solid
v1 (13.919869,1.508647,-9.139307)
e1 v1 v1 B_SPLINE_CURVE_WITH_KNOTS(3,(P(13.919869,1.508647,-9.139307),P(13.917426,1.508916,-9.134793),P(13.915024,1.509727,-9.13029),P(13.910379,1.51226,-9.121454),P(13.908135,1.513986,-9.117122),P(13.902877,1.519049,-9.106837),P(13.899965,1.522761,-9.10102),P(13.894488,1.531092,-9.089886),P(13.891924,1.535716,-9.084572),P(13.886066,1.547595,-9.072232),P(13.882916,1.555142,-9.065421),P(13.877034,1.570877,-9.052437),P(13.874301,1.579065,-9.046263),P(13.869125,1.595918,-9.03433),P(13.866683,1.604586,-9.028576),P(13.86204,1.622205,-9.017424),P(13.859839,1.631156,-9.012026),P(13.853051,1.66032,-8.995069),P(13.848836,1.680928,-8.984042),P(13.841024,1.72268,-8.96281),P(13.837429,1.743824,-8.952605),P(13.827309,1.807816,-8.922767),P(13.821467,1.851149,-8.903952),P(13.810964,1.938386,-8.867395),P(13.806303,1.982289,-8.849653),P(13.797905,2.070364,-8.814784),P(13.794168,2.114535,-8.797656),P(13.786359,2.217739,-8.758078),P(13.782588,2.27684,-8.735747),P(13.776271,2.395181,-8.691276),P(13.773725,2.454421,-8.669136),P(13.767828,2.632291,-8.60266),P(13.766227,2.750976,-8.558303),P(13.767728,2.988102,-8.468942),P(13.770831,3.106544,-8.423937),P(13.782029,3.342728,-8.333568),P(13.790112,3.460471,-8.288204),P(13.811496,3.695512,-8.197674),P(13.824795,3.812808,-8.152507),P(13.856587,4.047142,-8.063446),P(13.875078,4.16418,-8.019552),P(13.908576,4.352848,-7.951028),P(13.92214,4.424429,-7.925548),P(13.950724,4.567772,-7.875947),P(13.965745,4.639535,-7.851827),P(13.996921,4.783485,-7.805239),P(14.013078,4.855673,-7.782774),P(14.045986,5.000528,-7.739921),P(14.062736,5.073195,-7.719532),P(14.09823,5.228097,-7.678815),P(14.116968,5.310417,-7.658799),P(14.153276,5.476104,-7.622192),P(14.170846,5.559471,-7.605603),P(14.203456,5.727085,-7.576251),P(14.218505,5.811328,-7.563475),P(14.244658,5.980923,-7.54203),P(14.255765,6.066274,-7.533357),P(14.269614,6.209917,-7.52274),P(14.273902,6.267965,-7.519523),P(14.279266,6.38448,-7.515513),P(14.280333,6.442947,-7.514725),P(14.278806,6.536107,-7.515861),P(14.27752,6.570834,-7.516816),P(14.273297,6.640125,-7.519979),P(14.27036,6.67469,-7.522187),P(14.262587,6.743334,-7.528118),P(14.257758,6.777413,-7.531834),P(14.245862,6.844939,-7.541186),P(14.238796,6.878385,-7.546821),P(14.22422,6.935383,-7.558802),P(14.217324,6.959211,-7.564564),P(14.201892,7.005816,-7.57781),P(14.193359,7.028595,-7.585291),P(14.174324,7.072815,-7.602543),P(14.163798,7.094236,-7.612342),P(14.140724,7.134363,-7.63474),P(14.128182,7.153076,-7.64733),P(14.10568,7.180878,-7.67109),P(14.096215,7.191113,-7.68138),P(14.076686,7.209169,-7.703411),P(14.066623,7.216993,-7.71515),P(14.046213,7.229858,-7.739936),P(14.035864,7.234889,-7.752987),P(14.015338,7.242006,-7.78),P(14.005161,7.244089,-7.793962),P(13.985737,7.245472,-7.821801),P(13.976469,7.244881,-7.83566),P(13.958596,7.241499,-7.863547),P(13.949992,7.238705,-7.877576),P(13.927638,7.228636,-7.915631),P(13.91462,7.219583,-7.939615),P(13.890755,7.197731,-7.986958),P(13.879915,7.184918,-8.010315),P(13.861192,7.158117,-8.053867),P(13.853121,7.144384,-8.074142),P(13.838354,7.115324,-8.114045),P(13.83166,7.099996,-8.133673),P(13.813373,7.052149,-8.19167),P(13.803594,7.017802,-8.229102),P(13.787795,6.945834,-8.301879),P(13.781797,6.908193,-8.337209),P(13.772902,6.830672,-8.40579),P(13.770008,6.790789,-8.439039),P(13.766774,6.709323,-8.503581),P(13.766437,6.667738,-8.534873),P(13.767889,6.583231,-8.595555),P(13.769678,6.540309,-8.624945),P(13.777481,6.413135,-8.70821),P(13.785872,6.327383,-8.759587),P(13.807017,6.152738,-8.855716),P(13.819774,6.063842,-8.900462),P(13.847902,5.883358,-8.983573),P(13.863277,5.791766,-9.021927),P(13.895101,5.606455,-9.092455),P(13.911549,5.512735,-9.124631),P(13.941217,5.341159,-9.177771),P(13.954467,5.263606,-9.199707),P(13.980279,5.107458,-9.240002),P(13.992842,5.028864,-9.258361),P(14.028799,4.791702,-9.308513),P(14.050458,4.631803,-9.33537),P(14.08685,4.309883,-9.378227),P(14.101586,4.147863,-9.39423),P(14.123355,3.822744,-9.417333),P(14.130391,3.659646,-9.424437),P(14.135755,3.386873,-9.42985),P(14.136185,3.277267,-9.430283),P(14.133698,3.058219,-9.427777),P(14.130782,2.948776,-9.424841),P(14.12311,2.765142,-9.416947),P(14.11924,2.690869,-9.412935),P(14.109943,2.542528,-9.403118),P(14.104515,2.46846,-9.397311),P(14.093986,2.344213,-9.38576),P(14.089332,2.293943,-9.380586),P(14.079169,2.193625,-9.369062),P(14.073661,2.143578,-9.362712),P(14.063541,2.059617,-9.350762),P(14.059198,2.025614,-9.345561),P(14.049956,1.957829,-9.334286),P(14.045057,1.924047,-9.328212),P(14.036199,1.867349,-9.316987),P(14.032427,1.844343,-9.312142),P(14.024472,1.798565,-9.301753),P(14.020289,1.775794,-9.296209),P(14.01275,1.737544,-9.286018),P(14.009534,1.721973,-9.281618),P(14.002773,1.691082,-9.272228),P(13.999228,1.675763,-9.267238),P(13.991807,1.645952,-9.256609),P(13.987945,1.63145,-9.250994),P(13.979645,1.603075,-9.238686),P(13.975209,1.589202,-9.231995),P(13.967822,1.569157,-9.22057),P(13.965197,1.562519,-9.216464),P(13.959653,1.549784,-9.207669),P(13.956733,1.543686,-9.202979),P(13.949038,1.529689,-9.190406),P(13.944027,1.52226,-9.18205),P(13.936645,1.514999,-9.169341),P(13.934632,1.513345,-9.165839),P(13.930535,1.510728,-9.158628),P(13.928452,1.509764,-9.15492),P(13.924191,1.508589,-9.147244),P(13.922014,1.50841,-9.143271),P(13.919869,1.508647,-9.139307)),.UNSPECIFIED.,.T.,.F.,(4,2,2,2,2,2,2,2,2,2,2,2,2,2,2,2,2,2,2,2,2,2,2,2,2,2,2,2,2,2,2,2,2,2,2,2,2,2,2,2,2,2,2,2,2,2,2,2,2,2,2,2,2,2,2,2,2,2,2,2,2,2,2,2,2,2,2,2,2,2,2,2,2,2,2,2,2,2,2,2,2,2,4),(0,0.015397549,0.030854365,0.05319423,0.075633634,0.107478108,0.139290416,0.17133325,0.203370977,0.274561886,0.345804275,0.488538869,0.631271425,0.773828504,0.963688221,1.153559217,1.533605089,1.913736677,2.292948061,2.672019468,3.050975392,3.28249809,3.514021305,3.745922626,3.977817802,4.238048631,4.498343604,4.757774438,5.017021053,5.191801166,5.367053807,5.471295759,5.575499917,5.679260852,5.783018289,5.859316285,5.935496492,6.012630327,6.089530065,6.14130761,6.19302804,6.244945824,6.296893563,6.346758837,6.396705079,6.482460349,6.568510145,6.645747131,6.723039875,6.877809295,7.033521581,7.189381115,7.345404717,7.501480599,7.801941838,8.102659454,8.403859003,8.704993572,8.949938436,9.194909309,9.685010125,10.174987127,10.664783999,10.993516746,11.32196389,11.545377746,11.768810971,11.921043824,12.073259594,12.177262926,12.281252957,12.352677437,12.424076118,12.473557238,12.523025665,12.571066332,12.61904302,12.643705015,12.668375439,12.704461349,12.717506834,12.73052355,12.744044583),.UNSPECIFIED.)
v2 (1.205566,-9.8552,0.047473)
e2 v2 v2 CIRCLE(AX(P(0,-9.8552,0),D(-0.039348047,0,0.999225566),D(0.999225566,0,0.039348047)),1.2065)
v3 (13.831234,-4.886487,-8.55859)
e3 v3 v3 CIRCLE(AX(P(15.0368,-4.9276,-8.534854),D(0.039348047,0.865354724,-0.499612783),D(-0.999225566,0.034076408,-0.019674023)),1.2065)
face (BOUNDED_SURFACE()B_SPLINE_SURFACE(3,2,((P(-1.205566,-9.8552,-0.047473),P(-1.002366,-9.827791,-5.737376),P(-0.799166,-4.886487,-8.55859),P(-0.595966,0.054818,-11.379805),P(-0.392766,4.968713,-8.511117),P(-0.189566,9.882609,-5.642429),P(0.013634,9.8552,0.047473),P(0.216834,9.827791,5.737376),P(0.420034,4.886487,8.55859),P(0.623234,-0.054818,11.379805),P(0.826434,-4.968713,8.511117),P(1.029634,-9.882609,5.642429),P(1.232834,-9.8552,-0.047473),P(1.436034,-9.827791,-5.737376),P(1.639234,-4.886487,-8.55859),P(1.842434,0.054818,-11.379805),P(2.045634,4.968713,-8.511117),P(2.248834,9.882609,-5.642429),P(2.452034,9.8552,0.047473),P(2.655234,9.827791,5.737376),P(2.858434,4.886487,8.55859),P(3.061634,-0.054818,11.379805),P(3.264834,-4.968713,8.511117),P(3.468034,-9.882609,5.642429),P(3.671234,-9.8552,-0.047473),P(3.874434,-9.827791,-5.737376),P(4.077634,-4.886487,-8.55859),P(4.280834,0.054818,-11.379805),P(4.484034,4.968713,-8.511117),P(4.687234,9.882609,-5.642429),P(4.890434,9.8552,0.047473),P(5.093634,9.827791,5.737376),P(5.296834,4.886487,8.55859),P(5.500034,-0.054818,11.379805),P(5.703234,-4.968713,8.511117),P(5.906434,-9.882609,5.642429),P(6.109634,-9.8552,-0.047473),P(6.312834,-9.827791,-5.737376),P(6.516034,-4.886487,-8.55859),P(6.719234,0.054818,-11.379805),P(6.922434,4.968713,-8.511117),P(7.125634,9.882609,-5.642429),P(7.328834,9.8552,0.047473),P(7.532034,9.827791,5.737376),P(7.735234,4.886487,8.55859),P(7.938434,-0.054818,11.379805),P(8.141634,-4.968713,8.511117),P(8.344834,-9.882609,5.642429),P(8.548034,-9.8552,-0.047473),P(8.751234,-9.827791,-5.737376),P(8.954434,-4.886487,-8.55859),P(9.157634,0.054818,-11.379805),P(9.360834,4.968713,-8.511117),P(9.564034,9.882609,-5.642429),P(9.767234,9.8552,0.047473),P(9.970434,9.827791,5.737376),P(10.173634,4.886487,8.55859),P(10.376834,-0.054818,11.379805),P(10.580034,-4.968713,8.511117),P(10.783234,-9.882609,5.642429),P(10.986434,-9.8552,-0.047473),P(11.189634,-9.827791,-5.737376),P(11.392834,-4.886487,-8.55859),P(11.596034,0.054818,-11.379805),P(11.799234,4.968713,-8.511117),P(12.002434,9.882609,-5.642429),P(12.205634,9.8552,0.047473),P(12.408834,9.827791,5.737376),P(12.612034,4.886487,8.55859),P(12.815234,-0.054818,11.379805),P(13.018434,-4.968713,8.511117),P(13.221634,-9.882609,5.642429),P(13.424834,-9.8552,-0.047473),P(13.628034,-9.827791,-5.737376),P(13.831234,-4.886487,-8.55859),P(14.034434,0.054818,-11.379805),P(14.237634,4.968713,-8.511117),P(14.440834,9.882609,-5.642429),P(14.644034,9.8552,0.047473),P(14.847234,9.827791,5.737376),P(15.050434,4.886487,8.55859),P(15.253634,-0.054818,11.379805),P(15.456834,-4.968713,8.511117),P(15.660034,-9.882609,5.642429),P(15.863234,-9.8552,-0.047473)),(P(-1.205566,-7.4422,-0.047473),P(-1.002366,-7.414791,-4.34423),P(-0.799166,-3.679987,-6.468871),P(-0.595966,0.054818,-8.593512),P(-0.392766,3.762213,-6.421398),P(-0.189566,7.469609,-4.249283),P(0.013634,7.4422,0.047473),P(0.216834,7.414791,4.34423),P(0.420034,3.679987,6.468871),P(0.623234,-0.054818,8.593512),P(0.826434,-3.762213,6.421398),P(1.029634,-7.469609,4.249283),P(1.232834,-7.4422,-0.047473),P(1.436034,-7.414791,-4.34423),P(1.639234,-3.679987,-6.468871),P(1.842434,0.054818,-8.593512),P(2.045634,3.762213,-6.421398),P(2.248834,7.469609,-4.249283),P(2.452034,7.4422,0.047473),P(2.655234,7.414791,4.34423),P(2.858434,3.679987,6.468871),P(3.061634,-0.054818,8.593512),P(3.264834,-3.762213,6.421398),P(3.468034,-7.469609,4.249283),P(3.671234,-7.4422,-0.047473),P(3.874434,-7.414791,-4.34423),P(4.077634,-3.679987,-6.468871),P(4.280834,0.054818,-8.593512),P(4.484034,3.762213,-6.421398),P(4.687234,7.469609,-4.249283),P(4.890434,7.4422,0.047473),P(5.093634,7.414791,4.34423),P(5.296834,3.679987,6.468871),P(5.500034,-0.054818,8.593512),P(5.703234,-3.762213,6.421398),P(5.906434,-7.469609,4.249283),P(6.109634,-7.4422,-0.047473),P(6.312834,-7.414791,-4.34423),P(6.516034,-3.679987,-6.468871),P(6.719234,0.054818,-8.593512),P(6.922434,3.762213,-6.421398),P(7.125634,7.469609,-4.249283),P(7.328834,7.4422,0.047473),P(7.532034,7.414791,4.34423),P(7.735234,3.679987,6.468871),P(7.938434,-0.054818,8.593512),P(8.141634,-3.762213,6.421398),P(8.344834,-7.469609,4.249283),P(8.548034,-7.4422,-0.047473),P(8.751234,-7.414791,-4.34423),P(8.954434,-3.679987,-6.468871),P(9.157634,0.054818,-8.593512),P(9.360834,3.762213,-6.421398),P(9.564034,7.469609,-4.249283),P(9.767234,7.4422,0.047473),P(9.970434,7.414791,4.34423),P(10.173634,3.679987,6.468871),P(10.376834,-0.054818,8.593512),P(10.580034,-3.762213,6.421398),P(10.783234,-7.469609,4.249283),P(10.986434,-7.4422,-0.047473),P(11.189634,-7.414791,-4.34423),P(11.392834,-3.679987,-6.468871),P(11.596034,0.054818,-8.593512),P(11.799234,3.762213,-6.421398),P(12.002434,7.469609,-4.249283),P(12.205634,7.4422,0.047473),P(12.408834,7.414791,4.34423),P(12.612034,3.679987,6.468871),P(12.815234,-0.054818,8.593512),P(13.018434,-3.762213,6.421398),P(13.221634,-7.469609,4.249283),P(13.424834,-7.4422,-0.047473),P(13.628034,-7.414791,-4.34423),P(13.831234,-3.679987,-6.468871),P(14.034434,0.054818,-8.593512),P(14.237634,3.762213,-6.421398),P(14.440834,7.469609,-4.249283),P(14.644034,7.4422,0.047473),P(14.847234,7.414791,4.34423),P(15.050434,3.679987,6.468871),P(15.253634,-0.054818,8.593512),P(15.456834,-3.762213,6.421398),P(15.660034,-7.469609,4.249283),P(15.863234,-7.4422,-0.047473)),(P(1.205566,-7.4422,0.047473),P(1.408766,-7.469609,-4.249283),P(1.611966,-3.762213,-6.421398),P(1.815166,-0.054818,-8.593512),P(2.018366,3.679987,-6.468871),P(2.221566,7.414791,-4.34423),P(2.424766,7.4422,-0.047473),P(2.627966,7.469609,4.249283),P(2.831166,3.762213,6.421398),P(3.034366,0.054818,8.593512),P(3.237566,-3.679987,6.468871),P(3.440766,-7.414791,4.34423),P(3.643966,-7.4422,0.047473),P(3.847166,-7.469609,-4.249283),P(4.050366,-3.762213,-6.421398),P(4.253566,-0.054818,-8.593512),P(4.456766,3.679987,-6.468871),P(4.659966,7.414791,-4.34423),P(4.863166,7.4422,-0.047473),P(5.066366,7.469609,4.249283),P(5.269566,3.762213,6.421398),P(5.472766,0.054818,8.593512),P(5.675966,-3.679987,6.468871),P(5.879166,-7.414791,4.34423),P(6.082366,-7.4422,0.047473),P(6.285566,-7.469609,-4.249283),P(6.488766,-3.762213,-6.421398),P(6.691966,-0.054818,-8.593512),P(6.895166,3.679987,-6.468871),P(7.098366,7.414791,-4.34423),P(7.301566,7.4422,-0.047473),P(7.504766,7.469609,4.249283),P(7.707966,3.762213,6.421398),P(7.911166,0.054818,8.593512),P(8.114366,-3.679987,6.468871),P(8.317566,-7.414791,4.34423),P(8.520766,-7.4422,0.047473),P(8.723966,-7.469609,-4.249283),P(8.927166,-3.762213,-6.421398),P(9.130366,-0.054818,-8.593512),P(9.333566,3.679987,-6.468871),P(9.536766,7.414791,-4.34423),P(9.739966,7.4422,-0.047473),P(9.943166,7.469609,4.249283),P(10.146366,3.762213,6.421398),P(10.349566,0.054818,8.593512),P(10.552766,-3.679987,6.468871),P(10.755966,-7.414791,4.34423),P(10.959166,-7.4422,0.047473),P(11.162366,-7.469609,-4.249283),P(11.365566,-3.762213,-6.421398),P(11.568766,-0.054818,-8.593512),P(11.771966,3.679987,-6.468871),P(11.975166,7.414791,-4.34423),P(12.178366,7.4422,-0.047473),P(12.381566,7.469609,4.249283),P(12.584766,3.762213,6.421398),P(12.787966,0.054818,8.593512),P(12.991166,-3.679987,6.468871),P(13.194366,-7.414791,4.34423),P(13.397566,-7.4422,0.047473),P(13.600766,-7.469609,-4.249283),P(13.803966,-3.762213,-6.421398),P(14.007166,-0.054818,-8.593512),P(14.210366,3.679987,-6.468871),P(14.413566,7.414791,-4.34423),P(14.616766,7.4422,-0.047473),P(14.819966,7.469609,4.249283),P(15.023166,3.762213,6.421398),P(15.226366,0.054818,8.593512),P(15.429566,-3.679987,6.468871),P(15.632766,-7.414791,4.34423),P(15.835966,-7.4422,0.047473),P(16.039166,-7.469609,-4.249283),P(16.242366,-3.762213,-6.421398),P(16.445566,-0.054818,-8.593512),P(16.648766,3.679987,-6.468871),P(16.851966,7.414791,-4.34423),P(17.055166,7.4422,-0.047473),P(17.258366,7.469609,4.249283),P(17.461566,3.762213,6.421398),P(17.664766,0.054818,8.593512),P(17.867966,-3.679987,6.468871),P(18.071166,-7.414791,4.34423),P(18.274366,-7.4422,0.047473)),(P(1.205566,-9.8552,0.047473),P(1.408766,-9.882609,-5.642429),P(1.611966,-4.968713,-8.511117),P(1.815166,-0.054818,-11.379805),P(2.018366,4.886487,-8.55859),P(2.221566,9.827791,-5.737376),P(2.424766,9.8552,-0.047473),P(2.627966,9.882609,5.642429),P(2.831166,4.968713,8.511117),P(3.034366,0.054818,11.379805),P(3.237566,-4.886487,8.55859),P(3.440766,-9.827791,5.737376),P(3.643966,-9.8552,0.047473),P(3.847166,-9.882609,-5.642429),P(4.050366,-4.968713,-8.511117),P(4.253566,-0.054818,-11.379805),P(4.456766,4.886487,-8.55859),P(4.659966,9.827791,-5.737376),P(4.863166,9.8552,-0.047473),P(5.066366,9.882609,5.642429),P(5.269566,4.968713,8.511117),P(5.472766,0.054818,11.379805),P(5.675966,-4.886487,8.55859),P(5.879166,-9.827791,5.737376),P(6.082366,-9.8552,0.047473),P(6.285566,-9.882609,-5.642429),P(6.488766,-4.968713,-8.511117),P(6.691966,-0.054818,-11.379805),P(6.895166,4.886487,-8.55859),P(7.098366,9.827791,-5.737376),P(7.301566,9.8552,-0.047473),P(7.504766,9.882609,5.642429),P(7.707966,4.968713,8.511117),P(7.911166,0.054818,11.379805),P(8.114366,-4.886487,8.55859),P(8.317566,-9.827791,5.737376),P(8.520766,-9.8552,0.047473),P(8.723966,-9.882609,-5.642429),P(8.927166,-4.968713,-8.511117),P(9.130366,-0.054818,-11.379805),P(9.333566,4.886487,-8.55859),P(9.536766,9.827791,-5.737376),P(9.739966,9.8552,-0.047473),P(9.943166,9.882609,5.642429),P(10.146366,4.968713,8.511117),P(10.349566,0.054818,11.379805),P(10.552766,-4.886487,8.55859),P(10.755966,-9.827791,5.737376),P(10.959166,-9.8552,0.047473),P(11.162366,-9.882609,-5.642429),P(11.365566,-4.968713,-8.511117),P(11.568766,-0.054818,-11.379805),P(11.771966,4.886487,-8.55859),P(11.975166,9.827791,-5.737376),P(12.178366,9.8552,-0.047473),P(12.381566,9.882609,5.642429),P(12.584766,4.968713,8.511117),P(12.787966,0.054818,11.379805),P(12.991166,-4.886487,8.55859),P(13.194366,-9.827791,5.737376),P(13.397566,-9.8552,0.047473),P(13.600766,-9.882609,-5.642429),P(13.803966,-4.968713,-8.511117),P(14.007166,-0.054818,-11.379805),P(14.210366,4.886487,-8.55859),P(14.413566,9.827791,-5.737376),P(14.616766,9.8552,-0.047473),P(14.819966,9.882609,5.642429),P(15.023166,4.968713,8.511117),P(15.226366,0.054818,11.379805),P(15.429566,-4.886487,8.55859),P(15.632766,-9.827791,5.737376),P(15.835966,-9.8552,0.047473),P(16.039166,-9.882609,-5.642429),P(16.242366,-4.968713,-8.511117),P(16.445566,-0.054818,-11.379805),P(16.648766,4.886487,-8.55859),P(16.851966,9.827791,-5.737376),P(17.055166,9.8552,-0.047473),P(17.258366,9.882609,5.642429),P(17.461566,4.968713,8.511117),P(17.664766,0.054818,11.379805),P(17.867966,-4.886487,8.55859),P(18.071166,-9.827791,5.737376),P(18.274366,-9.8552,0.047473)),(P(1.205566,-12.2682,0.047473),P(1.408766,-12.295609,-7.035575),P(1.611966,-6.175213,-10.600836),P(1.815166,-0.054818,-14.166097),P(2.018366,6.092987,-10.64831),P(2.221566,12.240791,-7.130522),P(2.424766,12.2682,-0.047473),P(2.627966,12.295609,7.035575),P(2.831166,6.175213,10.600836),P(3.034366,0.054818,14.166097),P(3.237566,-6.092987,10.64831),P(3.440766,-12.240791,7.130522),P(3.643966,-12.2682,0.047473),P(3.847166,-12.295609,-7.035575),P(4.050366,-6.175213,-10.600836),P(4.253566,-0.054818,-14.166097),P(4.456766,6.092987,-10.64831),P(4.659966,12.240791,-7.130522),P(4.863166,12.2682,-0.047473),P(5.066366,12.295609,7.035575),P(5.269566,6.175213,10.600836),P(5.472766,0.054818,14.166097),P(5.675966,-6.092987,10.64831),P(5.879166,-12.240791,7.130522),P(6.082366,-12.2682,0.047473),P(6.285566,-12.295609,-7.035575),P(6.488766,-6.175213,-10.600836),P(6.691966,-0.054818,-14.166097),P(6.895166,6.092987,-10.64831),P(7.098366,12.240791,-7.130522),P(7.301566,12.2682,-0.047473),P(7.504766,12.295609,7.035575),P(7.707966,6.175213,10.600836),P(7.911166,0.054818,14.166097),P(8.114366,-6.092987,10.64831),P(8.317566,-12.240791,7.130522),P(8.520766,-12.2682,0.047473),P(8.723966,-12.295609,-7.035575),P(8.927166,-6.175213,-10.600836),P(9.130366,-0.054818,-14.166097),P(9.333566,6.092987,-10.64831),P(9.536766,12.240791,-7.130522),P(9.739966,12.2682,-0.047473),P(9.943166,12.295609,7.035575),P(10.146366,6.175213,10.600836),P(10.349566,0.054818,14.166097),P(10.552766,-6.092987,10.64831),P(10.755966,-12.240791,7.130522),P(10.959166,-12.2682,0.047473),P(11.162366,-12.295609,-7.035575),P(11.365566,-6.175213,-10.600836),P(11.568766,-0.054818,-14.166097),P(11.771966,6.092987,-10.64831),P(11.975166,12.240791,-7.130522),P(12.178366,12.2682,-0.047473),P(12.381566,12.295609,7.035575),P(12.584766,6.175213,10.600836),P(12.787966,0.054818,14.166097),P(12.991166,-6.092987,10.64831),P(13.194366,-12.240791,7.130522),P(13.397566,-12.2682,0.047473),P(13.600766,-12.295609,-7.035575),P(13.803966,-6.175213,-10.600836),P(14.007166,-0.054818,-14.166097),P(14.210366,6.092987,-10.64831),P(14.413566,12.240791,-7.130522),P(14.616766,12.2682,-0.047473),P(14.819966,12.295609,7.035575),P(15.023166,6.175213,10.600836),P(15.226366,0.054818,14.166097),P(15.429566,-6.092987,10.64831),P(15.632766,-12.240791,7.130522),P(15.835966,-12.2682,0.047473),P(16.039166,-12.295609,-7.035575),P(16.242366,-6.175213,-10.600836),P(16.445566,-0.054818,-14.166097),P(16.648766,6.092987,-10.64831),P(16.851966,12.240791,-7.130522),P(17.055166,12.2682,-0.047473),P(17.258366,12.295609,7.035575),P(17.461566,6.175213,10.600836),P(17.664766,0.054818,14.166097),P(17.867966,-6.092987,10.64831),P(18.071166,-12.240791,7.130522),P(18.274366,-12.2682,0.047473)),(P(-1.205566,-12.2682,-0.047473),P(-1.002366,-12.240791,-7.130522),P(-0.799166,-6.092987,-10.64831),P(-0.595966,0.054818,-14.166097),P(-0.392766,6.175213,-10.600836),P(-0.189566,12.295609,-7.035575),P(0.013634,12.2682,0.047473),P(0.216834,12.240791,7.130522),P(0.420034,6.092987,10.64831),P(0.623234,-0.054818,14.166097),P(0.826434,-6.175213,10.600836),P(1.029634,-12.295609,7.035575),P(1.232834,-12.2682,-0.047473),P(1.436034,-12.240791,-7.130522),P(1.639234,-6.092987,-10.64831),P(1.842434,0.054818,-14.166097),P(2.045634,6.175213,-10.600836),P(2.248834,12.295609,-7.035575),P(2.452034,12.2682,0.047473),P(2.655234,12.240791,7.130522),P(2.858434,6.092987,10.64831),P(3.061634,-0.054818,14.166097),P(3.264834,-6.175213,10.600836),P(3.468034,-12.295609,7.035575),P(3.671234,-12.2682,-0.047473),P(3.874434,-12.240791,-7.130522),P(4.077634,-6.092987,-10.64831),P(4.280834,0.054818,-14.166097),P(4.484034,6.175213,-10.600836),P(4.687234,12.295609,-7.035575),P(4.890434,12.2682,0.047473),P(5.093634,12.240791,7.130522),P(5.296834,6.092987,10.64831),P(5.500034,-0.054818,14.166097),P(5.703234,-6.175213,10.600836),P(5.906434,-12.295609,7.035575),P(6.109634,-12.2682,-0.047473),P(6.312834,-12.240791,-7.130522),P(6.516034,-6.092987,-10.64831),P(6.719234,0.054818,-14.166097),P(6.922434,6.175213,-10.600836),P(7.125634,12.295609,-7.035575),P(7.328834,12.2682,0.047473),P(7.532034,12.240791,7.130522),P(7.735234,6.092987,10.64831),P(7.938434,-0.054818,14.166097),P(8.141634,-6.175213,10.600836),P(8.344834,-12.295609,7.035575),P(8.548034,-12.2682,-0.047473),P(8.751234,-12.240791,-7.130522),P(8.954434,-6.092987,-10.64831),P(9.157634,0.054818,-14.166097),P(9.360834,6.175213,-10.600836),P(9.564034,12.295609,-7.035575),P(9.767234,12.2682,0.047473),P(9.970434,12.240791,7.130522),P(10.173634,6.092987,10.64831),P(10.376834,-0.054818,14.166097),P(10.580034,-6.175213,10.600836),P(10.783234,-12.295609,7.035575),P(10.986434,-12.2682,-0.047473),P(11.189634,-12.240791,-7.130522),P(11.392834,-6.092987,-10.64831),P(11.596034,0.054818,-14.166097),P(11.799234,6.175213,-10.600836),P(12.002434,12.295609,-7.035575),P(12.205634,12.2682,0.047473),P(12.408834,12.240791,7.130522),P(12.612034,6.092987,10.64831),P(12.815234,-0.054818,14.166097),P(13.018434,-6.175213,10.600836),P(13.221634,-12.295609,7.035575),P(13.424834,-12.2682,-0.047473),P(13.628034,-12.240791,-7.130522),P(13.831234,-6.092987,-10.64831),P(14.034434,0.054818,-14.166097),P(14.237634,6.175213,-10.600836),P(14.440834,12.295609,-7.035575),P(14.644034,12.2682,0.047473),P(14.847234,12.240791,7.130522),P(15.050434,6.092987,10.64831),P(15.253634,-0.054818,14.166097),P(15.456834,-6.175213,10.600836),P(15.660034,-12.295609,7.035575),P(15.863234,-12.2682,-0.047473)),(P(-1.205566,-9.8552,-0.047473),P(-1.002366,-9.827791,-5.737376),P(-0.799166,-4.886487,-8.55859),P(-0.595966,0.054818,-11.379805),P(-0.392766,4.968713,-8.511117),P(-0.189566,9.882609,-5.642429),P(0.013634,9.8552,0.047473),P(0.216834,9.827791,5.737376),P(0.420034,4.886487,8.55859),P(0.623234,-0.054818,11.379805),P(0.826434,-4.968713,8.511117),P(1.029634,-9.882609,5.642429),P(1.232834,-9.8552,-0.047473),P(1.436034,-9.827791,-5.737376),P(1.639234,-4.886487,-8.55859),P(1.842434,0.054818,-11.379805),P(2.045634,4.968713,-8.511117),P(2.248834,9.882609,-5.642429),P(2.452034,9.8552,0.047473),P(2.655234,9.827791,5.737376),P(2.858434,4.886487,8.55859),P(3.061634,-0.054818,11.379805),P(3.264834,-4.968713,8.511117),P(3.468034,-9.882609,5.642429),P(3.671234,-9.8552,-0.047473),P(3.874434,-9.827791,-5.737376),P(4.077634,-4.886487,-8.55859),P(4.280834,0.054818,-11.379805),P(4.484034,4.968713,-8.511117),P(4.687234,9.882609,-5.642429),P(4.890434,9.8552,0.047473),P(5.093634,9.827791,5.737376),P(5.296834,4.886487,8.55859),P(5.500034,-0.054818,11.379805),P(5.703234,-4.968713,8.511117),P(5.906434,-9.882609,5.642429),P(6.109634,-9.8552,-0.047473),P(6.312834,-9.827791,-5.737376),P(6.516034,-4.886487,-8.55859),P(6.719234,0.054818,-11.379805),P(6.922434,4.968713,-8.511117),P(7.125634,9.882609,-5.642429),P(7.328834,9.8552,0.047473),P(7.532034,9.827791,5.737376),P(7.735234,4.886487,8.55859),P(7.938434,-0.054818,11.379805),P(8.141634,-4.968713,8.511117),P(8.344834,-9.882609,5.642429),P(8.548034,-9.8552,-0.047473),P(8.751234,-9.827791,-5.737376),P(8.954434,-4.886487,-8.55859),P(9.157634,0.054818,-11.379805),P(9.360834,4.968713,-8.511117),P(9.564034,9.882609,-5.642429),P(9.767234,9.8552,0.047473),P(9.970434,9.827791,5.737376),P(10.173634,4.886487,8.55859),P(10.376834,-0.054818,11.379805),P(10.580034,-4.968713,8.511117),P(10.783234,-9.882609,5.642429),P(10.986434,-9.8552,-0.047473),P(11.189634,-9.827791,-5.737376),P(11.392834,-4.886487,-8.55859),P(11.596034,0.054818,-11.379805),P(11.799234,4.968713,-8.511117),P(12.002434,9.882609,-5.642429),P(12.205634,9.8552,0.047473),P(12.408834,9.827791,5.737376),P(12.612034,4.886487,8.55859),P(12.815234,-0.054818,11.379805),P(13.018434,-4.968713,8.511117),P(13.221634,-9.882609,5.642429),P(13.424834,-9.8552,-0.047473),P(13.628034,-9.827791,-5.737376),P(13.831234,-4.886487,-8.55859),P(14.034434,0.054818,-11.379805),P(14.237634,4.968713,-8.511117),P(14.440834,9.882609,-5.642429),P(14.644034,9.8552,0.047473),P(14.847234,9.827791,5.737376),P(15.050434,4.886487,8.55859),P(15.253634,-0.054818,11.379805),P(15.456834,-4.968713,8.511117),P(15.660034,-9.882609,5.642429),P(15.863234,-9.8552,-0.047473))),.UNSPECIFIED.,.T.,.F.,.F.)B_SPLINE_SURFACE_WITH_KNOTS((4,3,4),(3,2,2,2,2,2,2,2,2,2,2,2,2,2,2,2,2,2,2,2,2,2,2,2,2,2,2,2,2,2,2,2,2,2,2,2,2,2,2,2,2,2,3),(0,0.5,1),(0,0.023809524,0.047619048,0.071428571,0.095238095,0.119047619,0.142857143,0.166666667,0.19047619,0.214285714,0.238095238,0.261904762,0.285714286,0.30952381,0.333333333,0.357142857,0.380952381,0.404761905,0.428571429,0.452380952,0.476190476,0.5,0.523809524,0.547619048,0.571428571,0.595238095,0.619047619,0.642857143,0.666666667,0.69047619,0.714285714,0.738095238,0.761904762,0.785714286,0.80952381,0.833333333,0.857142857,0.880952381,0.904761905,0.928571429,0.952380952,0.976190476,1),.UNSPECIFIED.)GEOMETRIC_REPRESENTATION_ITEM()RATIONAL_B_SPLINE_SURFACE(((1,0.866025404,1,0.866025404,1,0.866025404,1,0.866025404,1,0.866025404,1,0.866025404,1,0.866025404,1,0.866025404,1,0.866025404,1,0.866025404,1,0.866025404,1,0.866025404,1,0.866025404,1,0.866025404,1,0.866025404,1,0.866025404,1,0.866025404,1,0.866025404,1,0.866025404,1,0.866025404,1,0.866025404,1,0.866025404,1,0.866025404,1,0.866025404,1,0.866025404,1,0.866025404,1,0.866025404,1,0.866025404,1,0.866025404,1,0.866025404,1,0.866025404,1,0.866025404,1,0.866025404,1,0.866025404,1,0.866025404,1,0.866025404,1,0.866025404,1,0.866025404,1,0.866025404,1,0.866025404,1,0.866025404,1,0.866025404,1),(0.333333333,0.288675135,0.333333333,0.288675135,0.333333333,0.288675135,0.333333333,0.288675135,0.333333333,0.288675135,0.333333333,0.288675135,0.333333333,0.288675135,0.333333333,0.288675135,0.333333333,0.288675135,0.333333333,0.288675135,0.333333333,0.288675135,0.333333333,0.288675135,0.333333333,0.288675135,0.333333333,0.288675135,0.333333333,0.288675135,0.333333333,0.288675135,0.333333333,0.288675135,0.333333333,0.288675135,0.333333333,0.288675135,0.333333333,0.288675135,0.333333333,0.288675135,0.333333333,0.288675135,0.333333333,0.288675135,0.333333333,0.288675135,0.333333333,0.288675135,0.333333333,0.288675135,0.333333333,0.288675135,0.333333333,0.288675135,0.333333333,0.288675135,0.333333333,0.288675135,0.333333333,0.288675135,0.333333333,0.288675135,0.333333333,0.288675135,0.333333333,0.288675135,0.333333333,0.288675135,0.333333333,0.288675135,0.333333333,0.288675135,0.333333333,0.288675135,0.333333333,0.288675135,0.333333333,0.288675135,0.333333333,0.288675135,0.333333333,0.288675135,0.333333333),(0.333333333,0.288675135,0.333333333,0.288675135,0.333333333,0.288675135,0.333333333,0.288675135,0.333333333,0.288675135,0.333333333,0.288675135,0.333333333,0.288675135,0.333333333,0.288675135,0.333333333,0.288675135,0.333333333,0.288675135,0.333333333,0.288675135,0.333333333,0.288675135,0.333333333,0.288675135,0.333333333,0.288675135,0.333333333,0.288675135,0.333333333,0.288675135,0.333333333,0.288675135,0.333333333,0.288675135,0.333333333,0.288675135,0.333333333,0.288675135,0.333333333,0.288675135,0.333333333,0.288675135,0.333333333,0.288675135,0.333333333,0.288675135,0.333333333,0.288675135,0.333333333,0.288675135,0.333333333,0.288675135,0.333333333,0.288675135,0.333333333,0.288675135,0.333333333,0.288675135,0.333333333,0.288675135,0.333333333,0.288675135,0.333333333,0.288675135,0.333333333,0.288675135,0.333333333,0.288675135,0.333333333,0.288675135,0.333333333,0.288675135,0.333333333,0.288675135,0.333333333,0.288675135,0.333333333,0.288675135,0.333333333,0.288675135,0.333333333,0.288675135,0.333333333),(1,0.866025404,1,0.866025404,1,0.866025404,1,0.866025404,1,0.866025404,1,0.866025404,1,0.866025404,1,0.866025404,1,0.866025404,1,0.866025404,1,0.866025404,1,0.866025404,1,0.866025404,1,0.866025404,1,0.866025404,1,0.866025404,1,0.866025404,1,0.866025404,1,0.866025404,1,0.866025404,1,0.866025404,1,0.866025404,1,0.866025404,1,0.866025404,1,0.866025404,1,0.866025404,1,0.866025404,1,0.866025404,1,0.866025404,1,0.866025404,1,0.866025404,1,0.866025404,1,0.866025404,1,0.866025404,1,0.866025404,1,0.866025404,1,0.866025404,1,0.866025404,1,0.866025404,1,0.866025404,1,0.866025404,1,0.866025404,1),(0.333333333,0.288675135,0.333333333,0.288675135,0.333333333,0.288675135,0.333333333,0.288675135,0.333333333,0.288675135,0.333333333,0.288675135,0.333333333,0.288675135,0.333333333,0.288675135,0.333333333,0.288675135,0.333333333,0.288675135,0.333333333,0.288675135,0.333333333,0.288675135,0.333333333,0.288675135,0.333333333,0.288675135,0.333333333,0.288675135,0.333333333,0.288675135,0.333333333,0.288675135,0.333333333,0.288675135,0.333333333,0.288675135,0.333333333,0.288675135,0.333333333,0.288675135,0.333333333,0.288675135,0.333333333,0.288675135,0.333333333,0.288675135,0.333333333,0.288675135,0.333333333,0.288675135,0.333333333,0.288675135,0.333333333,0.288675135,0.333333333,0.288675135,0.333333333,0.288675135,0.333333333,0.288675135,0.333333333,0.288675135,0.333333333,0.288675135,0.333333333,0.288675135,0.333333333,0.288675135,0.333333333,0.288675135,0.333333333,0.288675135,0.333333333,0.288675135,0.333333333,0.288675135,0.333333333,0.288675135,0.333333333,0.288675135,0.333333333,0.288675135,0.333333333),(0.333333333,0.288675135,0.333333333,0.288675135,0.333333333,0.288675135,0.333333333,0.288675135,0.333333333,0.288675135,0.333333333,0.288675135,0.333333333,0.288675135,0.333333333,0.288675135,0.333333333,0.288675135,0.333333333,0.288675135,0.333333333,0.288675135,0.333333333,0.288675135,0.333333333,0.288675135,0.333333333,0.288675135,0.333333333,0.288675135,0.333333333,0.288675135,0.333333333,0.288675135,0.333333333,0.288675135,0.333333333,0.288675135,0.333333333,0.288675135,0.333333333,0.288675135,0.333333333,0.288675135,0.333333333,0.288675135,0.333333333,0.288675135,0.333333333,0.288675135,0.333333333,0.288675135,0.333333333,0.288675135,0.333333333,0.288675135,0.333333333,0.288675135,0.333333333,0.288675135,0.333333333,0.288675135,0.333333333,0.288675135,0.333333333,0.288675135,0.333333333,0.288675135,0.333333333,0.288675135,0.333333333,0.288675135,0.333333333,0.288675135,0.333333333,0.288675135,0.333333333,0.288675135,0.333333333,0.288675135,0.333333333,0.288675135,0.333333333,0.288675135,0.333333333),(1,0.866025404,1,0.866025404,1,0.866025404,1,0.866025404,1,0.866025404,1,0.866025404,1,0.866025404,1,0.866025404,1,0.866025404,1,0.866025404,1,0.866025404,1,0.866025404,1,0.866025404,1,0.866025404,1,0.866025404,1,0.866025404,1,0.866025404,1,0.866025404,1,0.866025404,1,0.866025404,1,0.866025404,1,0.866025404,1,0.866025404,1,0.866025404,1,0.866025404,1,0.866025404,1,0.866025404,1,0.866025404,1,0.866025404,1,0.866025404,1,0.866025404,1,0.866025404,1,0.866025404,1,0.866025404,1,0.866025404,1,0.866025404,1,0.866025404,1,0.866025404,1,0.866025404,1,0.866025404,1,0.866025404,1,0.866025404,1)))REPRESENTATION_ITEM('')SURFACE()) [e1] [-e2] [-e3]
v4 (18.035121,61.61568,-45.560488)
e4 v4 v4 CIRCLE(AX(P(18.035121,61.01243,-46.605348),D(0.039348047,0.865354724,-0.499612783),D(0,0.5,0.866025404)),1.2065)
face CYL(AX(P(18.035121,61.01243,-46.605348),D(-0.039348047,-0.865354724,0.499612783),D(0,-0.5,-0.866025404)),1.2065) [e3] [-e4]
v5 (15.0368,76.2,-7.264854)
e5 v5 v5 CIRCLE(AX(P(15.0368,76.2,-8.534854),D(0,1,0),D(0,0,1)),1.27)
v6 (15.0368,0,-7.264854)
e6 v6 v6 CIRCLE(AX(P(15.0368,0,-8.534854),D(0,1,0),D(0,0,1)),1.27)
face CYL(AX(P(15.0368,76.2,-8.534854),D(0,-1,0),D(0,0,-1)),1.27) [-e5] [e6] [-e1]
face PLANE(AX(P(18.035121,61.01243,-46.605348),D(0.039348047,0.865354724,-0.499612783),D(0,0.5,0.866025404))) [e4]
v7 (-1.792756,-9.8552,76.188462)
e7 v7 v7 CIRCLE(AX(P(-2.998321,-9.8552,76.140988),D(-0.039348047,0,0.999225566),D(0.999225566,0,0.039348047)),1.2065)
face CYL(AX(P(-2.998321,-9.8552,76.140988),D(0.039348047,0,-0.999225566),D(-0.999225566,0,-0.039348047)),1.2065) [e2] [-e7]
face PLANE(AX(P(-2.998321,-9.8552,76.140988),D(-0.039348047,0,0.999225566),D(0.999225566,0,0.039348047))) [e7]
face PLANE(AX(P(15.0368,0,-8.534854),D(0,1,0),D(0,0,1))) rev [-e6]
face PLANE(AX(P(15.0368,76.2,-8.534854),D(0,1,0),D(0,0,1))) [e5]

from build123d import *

# Parameters (mm, degrees)
SWEEP1_PITCH        = 2.4384
SKETCH4_R           = 1.2065
EXTRUDE1_DEPTH      = 76.2
SKETCH5_R           = 1.2065
EXTRUDE2_DEPTH      = 76.2
SKETCH7_R           = 1.27
BOSS_EXTRUDE1_DEPTH = 76.2


with BuildPart() as part:
    # Sweep1: the profile of Sketch3 screwed along a right-hand helix of 6.166667 turns, 6 arcs to a turn; built about Z, then put on its axis
    sweep1_z = Axis((0, 0, 0), (0, 0, 1))
    sweep1_corners = [(9.88323439, -0.047460601, 1.205240148), (11.061374251, 0.001103098, -0.028012679), (9.82716561, 0.047460601, -1.205240148), (8.649025749, -0.001103098, 0.028012679)]
    with BuildLine(mode=Mode.PRIVATE) as sweep1_profile:
        ThreePointArc((9.88323439, -0.047460601, 1.205240148), (10.727917299, -0.032779704, 0.832425526), (11.061374251, 0.001103098, -0.028012679))
        ThreePointArc((11.061374251, 0.001103098, -0.028012679), (10.688270685, 0.034339721, -0.872041437), (9.82716561, 0.047460601, -1.205240148))
        ThreePointArc((9.82716561, 0.047460601, -1.205240148), (8.982482701, 0.032779704, -0.832425526), (8.649025749, -0.001103098, 0.028012679))
        ThreePointArc((8.649025749, -0.001103098, 0.028012679), (9.022129315, -0.034339721, 0.872041437), (9.88323439, -0.047460601, 1.205240148))
    sweep1_cap = Face(sweep1_profile.wire())
    sweep1_arcs = [((9.88323439, -0.047460601, 1.205240148), (11.08940864, -0.046357502, 1.177227469), (11.061374251, 0.001103098, -0.028012679), (1, 0.7071067811865476, 1)), ((11.061374251, 0.001103098, -0.028012679), (11.033339861, 0.048563699, -1.233252827), (9.82716561, 0.047460601, -1.205240148), (1, 0.7071067811865476, 1)), ((9.82716561, 0.047460601, -1.205240148), (8.62099136, 0.046357502, -1.177227469), (8.649025749, -0.001103098, 0.028012679), (1, 0.7071067811865476, 1)), ((8.649025749, -0.001103098, 0.028012679), (8.677060139, -0.048563699, 1.233252827), (9.88323439, -0.047460601, 1.205240148), (1, 0.7071067811865476, 1))]  # start, shoulder, end, weights
    sweep1_turn_angles = [0, 30, 60, 90, 120, 150, 180, 210, 240, 270, 300, 330, 360]
    sweep1_turn_weights = [1, 0.8660254037844387, 1, 0.8660254037844387, 1, 0.8660254037844387, 1, 0.8660254037844387, 1, 0.8660254037844387, 1, 0.8660254037844387, 1]
    sweep1_turn_sides = [Face.make_bezier_surface([[Vector(p[j][0], p[j][1], 0).rotate(sweep1_z, sweep1_turn_angles[2 * i + k]) / sweep1_turn_weights[2 * i + k] + Vector(0, 0, p[j][2] + SWEEP1_PITCH * sweep1_turn_angles[2 * i + k] / 360) for k in range(3)] for j in range(3)], [[p[3][j] * sweep1_turn_weights[2 * i + k] for k in range(3)] for j in range(3)]) for p in sweep1_arcs for i in range(6)]
    sweep1_last_angles = [2160, 2190, 2220]
    sweep1_last_weights = [1, 0.866025403784403, 1]
    sweep1_last_sides = [Face.make_bezier_surface([[Vector(p[j][0], p[j][1], 0).rotate(sweep1_z, sweep1_last_angles[2 * i + k]) / sweep1_last_weights[2 * i + k] + Vector(0, 0, p[j][2] + SWEEP1_PITCH * sweep1_last_angles[2 * i + k] / 360) for k in range(3)] for j in range(3)], [[p[3][j] * sweep1_last_weights[2 * i + k] for k in range(3)] for j in range(3)]) for p in sweep1_arcs for i in range(1)]
    sweep1 = Plane(origin=(0, 0, 0), x_dir=(0, -1, 0), z_dir=(1, 0, 0)) * Solid(Shell([*[p.moved(Location((0, 0, SWEEP1_PITCH * i))) for i in range(6) for p in sweep1_turn_sides], *sweep1_last_sides, sweep1_cap, sweep1_cap.rotate(sweep1_z, 2220).moved(Location((0, 0, SWEEP1_PITCH * 2220 / 360)))]))
    add(sweep1)

    # Sketch4 → Extrude1 (add)
    with BuildSketch(Plane(origin=(0, 0, 0), x_dir=(-0.9989557795402644, 0.02323612909274865, -0.03933742274079572), z_dir=(-0.03934804652827867, -1.074661193367632e-14, 0.9992255657429951))):
        with Locations(Location((-0.228996699, 9.852539142, 0), (0, 0, 181.33145196))):
            Circle(SKETCH4_R)
    extrude(amount=EXTRUDE1_DEPTH)

    # Sketch5 → Extrude2 (add)
    with BuildSketch(Plane(origin=(0.023281008, 0.51200331, -0.295605249), x_dir=(0.9981783086806318, -0.05692649144876503, -0.019985961343079544), z_dir=(0.03934804652827868, 0.8653547240443688, -0.49961278287139826))):
        with Locations(Location((15.460495825, 9.15714575, 0), (0, 0, 177.376564152))):
            Circle(SKETCH5_R)
    extrude(amount=EXTRUDE2_DEPTH)

    # Sketch7 → Boss-Extrude1 (add)
    with BuildSketch(Plane(origin=(0, 0, 0), x_dir=(1, 0, 0), z_dir=(0, 1, 0))):
        with Locations(Location((15.0368, 8.534853559, 0), (0, 0, 270))):
            Circle(SKETCH7_R)
    extrude(amount=BOSS_EXTRUDE1_DEPTH)


solid = part.part
